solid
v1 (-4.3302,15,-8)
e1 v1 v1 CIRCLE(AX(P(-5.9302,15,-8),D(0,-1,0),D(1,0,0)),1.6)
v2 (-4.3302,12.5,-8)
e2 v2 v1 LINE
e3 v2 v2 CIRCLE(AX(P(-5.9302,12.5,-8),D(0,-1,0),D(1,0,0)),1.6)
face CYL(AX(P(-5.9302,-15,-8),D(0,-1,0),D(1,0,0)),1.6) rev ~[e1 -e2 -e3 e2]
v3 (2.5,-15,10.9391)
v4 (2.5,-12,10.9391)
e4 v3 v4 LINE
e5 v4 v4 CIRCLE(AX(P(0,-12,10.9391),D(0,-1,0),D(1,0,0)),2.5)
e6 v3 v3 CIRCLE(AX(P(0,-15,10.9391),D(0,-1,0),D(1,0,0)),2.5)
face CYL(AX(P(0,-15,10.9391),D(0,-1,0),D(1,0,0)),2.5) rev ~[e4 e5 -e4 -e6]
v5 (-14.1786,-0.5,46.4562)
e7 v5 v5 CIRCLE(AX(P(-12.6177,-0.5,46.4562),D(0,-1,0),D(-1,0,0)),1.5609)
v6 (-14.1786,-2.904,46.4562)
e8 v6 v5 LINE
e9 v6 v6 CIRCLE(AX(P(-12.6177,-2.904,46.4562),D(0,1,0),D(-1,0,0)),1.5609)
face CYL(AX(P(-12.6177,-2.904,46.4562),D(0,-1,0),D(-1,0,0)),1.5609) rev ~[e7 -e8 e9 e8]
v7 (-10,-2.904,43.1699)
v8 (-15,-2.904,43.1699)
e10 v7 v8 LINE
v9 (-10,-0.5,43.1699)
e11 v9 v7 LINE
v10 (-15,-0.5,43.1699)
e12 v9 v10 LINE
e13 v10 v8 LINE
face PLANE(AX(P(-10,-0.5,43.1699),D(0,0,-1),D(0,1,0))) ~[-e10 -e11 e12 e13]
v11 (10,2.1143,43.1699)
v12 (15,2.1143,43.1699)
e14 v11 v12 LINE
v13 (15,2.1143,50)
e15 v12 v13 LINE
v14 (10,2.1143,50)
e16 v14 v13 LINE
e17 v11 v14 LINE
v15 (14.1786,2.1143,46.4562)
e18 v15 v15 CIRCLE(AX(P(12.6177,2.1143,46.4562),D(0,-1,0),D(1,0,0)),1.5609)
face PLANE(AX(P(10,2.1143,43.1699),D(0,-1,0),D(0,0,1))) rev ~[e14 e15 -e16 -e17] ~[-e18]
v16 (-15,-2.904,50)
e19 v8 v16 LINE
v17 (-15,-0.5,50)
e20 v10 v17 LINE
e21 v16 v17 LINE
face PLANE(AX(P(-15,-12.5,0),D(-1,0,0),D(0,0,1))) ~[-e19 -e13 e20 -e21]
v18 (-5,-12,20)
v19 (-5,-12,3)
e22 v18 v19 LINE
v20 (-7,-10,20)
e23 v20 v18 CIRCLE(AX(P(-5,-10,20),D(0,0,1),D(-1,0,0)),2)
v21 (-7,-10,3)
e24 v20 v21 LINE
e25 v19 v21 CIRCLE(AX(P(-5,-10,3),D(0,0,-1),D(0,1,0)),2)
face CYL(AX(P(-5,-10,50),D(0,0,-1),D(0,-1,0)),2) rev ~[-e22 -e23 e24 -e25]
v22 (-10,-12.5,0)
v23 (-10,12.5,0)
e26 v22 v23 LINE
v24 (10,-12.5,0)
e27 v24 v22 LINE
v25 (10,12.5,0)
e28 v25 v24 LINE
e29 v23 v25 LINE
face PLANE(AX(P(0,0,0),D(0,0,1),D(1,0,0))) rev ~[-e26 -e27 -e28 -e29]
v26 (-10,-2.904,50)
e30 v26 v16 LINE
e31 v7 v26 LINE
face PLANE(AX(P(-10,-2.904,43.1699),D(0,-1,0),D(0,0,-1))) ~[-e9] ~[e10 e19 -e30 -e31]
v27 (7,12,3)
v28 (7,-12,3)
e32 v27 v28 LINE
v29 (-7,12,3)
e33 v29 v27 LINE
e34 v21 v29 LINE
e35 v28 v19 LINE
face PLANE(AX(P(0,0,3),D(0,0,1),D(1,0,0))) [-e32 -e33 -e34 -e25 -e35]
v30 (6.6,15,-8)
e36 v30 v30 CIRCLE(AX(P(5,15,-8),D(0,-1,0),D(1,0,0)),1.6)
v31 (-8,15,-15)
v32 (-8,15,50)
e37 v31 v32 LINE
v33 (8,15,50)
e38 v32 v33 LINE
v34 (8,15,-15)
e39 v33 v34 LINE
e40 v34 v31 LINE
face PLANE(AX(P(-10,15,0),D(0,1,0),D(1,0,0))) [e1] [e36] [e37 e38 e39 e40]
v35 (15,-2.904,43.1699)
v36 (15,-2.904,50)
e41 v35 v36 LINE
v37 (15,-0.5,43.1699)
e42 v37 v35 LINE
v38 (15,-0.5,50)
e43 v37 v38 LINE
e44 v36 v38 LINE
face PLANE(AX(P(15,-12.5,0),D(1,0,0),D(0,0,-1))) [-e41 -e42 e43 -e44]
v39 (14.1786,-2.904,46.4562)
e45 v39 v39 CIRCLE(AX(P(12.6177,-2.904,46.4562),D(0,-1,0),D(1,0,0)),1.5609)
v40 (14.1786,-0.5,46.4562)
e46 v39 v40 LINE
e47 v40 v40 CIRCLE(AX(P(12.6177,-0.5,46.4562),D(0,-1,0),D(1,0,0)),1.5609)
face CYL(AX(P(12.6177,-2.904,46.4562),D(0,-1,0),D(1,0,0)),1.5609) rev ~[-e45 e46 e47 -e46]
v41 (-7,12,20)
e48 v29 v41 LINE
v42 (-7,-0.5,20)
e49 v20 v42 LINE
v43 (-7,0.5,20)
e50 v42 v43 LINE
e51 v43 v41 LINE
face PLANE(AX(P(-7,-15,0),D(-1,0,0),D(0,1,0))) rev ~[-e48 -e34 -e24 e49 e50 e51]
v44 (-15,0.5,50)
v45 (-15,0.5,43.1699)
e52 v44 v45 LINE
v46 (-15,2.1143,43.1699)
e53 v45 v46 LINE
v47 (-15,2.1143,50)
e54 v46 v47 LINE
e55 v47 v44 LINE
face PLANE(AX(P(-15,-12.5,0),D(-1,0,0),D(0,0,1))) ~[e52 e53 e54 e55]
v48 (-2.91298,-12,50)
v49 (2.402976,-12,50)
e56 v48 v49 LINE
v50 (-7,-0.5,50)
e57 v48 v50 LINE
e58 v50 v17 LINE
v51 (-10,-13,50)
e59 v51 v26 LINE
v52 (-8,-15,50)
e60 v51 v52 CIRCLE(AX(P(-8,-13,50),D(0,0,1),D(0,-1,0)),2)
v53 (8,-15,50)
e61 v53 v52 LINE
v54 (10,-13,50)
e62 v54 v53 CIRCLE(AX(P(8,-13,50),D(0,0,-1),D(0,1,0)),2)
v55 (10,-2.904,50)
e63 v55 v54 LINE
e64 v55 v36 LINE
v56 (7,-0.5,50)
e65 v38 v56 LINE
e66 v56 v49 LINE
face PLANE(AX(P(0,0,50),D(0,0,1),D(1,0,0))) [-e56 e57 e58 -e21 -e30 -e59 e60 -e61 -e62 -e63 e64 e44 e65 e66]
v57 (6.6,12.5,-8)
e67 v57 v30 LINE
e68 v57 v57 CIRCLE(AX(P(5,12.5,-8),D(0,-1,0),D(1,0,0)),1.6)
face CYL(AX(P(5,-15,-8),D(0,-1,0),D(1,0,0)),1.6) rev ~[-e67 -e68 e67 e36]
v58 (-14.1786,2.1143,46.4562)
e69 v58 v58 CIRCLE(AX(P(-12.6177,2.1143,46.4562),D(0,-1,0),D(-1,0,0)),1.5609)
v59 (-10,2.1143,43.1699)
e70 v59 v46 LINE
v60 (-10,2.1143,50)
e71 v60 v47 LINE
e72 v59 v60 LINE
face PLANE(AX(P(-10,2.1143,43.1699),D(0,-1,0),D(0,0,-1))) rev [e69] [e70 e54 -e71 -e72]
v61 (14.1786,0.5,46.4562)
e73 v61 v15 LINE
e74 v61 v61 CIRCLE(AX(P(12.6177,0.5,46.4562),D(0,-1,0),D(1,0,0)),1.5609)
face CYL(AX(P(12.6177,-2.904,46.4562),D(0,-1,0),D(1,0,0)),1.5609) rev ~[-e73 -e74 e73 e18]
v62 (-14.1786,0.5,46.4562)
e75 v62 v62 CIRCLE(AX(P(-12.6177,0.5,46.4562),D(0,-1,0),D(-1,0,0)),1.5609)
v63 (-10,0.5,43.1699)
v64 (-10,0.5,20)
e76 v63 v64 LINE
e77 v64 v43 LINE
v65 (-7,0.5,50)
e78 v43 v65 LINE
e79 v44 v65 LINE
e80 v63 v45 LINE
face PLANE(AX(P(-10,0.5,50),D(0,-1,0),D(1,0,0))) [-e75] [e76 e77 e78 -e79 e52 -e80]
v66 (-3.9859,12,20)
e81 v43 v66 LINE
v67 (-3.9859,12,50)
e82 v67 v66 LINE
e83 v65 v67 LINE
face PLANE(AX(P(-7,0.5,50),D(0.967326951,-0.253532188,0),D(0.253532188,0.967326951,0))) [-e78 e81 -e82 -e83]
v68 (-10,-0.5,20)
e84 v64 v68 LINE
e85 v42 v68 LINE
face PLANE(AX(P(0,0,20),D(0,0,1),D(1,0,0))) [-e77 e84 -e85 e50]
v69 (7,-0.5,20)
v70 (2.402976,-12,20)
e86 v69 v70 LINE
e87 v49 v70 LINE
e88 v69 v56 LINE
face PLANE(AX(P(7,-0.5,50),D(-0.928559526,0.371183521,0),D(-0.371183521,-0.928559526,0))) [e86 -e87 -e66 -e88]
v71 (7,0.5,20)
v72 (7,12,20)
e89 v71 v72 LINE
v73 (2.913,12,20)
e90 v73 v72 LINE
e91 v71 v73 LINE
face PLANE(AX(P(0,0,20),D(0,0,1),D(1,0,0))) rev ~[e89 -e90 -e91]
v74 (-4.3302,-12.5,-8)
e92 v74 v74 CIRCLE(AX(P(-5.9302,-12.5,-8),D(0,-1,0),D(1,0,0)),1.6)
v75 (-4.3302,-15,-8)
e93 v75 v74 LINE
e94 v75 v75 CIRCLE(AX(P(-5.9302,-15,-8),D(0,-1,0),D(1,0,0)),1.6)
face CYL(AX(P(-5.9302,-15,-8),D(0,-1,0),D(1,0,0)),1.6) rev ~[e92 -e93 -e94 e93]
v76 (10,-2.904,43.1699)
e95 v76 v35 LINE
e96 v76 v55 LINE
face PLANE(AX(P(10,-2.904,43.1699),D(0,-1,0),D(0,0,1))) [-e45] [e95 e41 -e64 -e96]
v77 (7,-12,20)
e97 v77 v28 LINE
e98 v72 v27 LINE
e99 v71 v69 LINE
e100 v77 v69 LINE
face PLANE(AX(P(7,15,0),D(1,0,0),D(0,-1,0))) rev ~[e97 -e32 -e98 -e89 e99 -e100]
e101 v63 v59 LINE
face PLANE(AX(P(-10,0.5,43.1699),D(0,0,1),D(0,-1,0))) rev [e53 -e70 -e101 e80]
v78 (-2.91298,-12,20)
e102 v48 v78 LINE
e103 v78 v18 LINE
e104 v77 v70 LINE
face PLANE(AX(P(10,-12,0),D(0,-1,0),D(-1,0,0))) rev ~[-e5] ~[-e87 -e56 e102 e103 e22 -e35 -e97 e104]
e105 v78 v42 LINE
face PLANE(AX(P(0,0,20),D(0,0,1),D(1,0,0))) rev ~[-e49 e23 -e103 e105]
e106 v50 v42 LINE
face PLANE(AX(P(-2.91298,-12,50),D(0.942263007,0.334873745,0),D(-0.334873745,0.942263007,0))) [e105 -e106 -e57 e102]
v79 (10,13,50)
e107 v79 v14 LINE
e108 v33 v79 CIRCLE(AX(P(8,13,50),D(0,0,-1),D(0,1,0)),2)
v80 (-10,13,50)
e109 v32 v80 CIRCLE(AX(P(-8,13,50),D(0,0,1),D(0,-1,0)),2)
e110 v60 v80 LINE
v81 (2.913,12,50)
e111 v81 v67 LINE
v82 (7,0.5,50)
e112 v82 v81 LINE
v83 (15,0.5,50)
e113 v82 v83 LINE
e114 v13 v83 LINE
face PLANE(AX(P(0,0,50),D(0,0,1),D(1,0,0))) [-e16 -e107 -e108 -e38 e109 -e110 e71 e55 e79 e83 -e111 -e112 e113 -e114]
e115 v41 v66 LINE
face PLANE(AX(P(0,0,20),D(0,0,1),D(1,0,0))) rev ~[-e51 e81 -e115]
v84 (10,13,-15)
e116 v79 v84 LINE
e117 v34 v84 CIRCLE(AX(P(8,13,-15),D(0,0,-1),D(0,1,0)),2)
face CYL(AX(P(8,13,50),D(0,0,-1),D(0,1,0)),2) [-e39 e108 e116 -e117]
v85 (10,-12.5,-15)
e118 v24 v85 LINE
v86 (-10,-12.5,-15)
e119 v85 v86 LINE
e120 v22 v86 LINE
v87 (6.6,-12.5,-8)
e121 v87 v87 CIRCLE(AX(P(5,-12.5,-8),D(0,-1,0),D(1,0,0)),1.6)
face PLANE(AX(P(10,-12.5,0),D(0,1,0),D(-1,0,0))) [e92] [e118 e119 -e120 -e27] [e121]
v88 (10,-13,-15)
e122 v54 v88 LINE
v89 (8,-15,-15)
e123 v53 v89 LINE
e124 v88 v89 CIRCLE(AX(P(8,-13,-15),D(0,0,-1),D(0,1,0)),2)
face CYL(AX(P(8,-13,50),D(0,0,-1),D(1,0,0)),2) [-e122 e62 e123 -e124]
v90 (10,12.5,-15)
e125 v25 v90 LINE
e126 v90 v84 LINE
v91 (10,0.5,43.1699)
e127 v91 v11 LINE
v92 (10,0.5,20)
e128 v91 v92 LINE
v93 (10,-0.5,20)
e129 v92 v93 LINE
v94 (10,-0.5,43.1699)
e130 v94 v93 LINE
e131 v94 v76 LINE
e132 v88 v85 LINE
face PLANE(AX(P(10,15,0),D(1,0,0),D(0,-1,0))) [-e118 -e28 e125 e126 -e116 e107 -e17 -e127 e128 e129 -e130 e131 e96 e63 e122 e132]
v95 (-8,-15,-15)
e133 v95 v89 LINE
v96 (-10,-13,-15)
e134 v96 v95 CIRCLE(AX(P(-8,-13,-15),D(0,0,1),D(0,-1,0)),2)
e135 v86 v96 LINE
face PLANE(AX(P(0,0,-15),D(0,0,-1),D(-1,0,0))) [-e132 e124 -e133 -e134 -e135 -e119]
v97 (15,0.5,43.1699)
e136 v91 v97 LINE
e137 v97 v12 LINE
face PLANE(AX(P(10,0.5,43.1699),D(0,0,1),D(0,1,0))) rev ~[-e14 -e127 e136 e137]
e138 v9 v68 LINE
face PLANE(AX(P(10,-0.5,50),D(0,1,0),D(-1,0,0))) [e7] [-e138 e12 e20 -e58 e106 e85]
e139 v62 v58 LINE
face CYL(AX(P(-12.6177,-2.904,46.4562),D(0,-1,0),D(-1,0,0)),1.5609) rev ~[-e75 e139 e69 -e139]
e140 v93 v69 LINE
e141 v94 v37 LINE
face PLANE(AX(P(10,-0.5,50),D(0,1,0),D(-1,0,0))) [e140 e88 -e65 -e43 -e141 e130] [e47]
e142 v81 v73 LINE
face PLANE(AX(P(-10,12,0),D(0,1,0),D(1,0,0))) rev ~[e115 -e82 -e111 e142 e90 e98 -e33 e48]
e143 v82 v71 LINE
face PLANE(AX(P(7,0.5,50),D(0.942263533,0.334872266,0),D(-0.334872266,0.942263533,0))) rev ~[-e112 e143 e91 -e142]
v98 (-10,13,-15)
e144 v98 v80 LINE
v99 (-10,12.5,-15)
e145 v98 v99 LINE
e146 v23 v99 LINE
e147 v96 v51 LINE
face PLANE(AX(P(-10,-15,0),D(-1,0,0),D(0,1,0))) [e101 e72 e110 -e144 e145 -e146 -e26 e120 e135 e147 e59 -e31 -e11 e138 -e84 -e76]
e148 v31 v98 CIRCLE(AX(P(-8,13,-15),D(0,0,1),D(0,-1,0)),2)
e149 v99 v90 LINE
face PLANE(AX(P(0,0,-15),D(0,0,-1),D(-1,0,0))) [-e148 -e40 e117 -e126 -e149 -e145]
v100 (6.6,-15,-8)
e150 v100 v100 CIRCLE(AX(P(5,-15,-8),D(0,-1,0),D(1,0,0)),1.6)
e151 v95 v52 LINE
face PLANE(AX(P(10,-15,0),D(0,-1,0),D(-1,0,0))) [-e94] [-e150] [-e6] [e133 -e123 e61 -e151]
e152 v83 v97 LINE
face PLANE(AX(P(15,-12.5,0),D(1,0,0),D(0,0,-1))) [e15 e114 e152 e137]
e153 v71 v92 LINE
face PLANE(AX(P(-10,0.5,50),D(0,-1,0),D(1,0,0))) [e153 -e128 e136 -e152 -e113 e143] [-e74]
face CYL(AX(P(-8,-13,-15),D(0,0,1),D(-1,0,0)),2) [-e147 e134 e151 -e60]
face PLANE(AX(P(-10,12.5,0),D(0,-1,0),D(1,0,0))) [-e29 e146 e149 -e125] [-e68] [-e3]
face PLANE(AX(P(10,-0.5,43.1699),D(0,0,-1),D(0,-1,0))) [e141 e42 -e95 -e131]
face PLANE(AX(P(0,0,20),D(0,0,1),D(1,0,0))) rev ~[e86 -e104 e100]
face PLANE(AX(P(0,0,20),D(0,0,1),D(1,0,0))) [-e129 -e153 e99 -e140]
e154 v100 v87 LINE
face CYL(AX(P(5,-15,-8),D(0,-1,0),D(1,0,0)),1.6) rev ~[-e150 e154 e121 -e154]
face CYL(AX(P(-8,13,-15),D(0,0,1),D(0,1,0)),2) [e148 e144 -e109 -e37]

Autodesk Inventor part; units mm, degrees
ref_plane "YZ Plane" through (0, 0, 0) normal (1, 0, 0) x (0, 1, 0)
ref_plane "XZ Plane" through (0, 0, 0) normal (0, 1, 0) x (-1, 0, 0)
ref_plane "XY Plane" through (0, 0, 0) normal (0, 0, 1) x (1, 0, 0)
sketch "Sketch1" plane through (0, 0, 0) normal (0, 0, 1) x (1, 0, 0)
  line L0 (-10, 15) -> (10, 15)
  line L1 (10, 15) -> (10, -15)
  line L2 (10, -15) -> (-10, -15)
  line L3 (-10, -15) -> (-10, 15)
  line L4 (-10, 15) -> (10, -15) construction
  line L5 (10, 15) -> (-10, -15) construction
  point P0 (0, 0)
  dimension "d0" = 20
  dimension "d1" = 30
extrude "Extrusion1" add sketch "Sketch1" along normal blind 50
shell "Shell1" thickness 3 removed faces 1 at (-3.3333, 5, 50)
sketch "Sketch2" plane through (-10, 15, 0) normal (0, 1, 0) x (1, 0, 0)
  line L0 (3, -3) -> (17, -3) projected
  line L1 (-7, -47) -> (17, -47)
  line L2 (17, -47) -> (17, -3)
  line L3 (17, -3) -> (-7, -3)
  line L4 (-7, -3) -> (-7, -47)
  line L5 (-7, -47) -> (17, -3) construction
  line L6 (17, -47) -> (-7, -3) construction
  point P0 (10, 0)
  point P1 (5, -25)
sketch "Sketch3" plane through (0, 0, 0) normal (0, 0, -1) x (-1, 0, 0)
  line L0 (-10, 15) -> (10, 15) projected
  line L1 (10, 15) -> (10, -15) projected
  line L2 (-10, 15) -> (10, 15)
  line L3 (10, 15) -> (10, 12.5)
  line L4 (10, 12.5) -> (-10, 12.5)
  line L5 (-10, 12.5) -> (-10, 15)
  line L6 (-10, -15) -> (-10, 15) projected
  line L7 (10, -15) -> (-10, -15)
  line L8 (-10, -15) -> (-10, -12.5)
  line L9 (-10, -12.5) -> (10, -12.5)
  line L10 (10, -12.5) -> (10, -15)
  point P0 (0, 0)
  point P1 (10, -12.5)
  dimension "d5" = 2.5
  dimension "d6" = 2.5
extrude "Extrusion2" add sketch "Sketch3" along normal blind 15 contours L0 L1 L4 L5 | L9 L1 L7 L6
sketch "Sketch4" plane through (-10, 15, 50) normal (0, 1, 0) x (1, 0, 0)
  point P0 (10, 50)
sketch "Sketch6" plane through (-10, -15, 50) normal (0, -1, 0) x (1, 0, 0)
  circle A0 centre (4.0698, -58) radius 1.6 projected
  circle A1 centre (15, -58) radius 1.6 projected
  point P0 (10, -50)
extrude "Extrusion4" cut sketch "Sketch6" against normal through all
fillet "Fillet1" radius 2 4 edges at (-7, -12, 26.5) (10, -15, 17.5) (-10, 15, 17.5) (10, 15, 17.5)
fillet "Fillet2" radius 2 1 edges at (-10, -15, 17.5)
sketch "Sketch7" plane through (8, -15, -15) normal (0, -1, 0) x (1, 0, 0)
  circle A0 centre (-8, 25.9391) radius 2.5
  point P0 (-8, 15)
  dimension "d17" = 5
extrude "Extrusion5" cut sketch "Sketch7" against normal blind 10
sketch "Sketch8" plane through (0, 0, 50) normal (0, 0, 1) x (1, 0, 0)
  line L0 (-10, 12.5) -> (-10, -12.5) projected
  line L1 (10, -0.5) -> (-10, -0.5)
  line L2 (-10, -0.5) -> (-10, 0.5)
  line L3 (-10, 0.5) -> (10, 0.5)
  line L4 (10, 0.5) -> (10, -0.5)
  line L5 (10, -0.5) -> (-10, 0.5) construction
  line L6 (-10, -0.5) -> (10, 0.5) construction
  point P0 (0, 0)
  dimension "d20" = 1
extrude "Extrusion6" cut sketch "Sketch8" against normal blind 30
sketch "Sketch9" plane through (0, 0, 50) normal (0, 0, 1) x (1, 0, 0)
  line L0 (-7, 0.5) -> (-3.9859, 12)
  line L1 (-7, 12) -> (7, 12) projected
  line L2 (-3.9859, 12) -> (2.913, 12)
  line L3 (7, 0.5) -> (2.913, 12)
  line L4 (7, -0.5) -> (2.3967, -12.0157)
  line L5 (2.3967, -12.0157) -> (-2.9074, -12.0157)
  line L6 (7, -12) -> (7, 12) projected
  line L7 (-7, -10) -> (-7, -0.5) projected
  line L8 (-2.9074, -12.0157) -> (-7, -0.5)
  line L9 (-7, -0.5) -> (7, -0.5)
  line L10 (10, -12.5) -> (10, 12.5) projected
  line L11 (7, 0.5) -> (-7, 0.5)
  line L12 (10, 12.5) -> (-10, 12.5) projected
  line L13 (7, -12) -> (-5, -12) projected
  arc A0 (-7, -10) -> (-5, -12) centre (-5, -10) ccw projected
  line L14 (-7, 0.5) -> (-7, 12) projected
  point P0 (0, 0)
  point P1 (2.403, -12)
  point P2 (-2.913, -12)
extrude "Extrusion7" add sketch "Sketch9" against normal blind 30 contours L14 L1 L0 | L3 L1 L6 | L6 L13 L4 | L8 L13 A0 L7
sketch "Sketch10" plane through (10, -12.5, 0) normal (1, 0, 0) x (0, 0, -1)
  line L0 (-20, 12) -> (-50, 12) projected
  line L1 (-50, 12) -> (-43.1699, 12)
  line L2 (-43.1699, 12) -> (-43.1699, 9.596)
  line L3 (-43.1699, 9.596) -> (-50, 9.596)
  line L4 (-50, 9.596) -> (-50, 12)
  line L5 (-50, 13) -> (-43.1699, 13)
  line L6 (-43.1699, 13) -> (-43.1699, 14.6143)
  line L7 (-43.1699, 14.6143) -> (-50, 14.6143)
  line L8 (-50, 14.6143) -> (-50, 13)
  point P0 (0, 12.5)
extrude "Extrusion8" add sketch "Sketch10" along normal blind 5
sketch "Sketch11" plane through (10, -2.904, 43.1699) normal (0, -1, 0) x (1, 0, 0)
  circle A0 centre (2.6177, 3.2863) radius 1.5609
  point P0 (-10, -43.1699)
extrude "Extrusion9" cut sketch "Sketch11" against normal blind 6.25
mirror "Mirror1" about plane through (0, 0, 0) normal (1, 0, 0) of "Extrusion8", "Extrusion9"
properties part number "SUCTION_EXTENSION1" material "Iron, Gray"
